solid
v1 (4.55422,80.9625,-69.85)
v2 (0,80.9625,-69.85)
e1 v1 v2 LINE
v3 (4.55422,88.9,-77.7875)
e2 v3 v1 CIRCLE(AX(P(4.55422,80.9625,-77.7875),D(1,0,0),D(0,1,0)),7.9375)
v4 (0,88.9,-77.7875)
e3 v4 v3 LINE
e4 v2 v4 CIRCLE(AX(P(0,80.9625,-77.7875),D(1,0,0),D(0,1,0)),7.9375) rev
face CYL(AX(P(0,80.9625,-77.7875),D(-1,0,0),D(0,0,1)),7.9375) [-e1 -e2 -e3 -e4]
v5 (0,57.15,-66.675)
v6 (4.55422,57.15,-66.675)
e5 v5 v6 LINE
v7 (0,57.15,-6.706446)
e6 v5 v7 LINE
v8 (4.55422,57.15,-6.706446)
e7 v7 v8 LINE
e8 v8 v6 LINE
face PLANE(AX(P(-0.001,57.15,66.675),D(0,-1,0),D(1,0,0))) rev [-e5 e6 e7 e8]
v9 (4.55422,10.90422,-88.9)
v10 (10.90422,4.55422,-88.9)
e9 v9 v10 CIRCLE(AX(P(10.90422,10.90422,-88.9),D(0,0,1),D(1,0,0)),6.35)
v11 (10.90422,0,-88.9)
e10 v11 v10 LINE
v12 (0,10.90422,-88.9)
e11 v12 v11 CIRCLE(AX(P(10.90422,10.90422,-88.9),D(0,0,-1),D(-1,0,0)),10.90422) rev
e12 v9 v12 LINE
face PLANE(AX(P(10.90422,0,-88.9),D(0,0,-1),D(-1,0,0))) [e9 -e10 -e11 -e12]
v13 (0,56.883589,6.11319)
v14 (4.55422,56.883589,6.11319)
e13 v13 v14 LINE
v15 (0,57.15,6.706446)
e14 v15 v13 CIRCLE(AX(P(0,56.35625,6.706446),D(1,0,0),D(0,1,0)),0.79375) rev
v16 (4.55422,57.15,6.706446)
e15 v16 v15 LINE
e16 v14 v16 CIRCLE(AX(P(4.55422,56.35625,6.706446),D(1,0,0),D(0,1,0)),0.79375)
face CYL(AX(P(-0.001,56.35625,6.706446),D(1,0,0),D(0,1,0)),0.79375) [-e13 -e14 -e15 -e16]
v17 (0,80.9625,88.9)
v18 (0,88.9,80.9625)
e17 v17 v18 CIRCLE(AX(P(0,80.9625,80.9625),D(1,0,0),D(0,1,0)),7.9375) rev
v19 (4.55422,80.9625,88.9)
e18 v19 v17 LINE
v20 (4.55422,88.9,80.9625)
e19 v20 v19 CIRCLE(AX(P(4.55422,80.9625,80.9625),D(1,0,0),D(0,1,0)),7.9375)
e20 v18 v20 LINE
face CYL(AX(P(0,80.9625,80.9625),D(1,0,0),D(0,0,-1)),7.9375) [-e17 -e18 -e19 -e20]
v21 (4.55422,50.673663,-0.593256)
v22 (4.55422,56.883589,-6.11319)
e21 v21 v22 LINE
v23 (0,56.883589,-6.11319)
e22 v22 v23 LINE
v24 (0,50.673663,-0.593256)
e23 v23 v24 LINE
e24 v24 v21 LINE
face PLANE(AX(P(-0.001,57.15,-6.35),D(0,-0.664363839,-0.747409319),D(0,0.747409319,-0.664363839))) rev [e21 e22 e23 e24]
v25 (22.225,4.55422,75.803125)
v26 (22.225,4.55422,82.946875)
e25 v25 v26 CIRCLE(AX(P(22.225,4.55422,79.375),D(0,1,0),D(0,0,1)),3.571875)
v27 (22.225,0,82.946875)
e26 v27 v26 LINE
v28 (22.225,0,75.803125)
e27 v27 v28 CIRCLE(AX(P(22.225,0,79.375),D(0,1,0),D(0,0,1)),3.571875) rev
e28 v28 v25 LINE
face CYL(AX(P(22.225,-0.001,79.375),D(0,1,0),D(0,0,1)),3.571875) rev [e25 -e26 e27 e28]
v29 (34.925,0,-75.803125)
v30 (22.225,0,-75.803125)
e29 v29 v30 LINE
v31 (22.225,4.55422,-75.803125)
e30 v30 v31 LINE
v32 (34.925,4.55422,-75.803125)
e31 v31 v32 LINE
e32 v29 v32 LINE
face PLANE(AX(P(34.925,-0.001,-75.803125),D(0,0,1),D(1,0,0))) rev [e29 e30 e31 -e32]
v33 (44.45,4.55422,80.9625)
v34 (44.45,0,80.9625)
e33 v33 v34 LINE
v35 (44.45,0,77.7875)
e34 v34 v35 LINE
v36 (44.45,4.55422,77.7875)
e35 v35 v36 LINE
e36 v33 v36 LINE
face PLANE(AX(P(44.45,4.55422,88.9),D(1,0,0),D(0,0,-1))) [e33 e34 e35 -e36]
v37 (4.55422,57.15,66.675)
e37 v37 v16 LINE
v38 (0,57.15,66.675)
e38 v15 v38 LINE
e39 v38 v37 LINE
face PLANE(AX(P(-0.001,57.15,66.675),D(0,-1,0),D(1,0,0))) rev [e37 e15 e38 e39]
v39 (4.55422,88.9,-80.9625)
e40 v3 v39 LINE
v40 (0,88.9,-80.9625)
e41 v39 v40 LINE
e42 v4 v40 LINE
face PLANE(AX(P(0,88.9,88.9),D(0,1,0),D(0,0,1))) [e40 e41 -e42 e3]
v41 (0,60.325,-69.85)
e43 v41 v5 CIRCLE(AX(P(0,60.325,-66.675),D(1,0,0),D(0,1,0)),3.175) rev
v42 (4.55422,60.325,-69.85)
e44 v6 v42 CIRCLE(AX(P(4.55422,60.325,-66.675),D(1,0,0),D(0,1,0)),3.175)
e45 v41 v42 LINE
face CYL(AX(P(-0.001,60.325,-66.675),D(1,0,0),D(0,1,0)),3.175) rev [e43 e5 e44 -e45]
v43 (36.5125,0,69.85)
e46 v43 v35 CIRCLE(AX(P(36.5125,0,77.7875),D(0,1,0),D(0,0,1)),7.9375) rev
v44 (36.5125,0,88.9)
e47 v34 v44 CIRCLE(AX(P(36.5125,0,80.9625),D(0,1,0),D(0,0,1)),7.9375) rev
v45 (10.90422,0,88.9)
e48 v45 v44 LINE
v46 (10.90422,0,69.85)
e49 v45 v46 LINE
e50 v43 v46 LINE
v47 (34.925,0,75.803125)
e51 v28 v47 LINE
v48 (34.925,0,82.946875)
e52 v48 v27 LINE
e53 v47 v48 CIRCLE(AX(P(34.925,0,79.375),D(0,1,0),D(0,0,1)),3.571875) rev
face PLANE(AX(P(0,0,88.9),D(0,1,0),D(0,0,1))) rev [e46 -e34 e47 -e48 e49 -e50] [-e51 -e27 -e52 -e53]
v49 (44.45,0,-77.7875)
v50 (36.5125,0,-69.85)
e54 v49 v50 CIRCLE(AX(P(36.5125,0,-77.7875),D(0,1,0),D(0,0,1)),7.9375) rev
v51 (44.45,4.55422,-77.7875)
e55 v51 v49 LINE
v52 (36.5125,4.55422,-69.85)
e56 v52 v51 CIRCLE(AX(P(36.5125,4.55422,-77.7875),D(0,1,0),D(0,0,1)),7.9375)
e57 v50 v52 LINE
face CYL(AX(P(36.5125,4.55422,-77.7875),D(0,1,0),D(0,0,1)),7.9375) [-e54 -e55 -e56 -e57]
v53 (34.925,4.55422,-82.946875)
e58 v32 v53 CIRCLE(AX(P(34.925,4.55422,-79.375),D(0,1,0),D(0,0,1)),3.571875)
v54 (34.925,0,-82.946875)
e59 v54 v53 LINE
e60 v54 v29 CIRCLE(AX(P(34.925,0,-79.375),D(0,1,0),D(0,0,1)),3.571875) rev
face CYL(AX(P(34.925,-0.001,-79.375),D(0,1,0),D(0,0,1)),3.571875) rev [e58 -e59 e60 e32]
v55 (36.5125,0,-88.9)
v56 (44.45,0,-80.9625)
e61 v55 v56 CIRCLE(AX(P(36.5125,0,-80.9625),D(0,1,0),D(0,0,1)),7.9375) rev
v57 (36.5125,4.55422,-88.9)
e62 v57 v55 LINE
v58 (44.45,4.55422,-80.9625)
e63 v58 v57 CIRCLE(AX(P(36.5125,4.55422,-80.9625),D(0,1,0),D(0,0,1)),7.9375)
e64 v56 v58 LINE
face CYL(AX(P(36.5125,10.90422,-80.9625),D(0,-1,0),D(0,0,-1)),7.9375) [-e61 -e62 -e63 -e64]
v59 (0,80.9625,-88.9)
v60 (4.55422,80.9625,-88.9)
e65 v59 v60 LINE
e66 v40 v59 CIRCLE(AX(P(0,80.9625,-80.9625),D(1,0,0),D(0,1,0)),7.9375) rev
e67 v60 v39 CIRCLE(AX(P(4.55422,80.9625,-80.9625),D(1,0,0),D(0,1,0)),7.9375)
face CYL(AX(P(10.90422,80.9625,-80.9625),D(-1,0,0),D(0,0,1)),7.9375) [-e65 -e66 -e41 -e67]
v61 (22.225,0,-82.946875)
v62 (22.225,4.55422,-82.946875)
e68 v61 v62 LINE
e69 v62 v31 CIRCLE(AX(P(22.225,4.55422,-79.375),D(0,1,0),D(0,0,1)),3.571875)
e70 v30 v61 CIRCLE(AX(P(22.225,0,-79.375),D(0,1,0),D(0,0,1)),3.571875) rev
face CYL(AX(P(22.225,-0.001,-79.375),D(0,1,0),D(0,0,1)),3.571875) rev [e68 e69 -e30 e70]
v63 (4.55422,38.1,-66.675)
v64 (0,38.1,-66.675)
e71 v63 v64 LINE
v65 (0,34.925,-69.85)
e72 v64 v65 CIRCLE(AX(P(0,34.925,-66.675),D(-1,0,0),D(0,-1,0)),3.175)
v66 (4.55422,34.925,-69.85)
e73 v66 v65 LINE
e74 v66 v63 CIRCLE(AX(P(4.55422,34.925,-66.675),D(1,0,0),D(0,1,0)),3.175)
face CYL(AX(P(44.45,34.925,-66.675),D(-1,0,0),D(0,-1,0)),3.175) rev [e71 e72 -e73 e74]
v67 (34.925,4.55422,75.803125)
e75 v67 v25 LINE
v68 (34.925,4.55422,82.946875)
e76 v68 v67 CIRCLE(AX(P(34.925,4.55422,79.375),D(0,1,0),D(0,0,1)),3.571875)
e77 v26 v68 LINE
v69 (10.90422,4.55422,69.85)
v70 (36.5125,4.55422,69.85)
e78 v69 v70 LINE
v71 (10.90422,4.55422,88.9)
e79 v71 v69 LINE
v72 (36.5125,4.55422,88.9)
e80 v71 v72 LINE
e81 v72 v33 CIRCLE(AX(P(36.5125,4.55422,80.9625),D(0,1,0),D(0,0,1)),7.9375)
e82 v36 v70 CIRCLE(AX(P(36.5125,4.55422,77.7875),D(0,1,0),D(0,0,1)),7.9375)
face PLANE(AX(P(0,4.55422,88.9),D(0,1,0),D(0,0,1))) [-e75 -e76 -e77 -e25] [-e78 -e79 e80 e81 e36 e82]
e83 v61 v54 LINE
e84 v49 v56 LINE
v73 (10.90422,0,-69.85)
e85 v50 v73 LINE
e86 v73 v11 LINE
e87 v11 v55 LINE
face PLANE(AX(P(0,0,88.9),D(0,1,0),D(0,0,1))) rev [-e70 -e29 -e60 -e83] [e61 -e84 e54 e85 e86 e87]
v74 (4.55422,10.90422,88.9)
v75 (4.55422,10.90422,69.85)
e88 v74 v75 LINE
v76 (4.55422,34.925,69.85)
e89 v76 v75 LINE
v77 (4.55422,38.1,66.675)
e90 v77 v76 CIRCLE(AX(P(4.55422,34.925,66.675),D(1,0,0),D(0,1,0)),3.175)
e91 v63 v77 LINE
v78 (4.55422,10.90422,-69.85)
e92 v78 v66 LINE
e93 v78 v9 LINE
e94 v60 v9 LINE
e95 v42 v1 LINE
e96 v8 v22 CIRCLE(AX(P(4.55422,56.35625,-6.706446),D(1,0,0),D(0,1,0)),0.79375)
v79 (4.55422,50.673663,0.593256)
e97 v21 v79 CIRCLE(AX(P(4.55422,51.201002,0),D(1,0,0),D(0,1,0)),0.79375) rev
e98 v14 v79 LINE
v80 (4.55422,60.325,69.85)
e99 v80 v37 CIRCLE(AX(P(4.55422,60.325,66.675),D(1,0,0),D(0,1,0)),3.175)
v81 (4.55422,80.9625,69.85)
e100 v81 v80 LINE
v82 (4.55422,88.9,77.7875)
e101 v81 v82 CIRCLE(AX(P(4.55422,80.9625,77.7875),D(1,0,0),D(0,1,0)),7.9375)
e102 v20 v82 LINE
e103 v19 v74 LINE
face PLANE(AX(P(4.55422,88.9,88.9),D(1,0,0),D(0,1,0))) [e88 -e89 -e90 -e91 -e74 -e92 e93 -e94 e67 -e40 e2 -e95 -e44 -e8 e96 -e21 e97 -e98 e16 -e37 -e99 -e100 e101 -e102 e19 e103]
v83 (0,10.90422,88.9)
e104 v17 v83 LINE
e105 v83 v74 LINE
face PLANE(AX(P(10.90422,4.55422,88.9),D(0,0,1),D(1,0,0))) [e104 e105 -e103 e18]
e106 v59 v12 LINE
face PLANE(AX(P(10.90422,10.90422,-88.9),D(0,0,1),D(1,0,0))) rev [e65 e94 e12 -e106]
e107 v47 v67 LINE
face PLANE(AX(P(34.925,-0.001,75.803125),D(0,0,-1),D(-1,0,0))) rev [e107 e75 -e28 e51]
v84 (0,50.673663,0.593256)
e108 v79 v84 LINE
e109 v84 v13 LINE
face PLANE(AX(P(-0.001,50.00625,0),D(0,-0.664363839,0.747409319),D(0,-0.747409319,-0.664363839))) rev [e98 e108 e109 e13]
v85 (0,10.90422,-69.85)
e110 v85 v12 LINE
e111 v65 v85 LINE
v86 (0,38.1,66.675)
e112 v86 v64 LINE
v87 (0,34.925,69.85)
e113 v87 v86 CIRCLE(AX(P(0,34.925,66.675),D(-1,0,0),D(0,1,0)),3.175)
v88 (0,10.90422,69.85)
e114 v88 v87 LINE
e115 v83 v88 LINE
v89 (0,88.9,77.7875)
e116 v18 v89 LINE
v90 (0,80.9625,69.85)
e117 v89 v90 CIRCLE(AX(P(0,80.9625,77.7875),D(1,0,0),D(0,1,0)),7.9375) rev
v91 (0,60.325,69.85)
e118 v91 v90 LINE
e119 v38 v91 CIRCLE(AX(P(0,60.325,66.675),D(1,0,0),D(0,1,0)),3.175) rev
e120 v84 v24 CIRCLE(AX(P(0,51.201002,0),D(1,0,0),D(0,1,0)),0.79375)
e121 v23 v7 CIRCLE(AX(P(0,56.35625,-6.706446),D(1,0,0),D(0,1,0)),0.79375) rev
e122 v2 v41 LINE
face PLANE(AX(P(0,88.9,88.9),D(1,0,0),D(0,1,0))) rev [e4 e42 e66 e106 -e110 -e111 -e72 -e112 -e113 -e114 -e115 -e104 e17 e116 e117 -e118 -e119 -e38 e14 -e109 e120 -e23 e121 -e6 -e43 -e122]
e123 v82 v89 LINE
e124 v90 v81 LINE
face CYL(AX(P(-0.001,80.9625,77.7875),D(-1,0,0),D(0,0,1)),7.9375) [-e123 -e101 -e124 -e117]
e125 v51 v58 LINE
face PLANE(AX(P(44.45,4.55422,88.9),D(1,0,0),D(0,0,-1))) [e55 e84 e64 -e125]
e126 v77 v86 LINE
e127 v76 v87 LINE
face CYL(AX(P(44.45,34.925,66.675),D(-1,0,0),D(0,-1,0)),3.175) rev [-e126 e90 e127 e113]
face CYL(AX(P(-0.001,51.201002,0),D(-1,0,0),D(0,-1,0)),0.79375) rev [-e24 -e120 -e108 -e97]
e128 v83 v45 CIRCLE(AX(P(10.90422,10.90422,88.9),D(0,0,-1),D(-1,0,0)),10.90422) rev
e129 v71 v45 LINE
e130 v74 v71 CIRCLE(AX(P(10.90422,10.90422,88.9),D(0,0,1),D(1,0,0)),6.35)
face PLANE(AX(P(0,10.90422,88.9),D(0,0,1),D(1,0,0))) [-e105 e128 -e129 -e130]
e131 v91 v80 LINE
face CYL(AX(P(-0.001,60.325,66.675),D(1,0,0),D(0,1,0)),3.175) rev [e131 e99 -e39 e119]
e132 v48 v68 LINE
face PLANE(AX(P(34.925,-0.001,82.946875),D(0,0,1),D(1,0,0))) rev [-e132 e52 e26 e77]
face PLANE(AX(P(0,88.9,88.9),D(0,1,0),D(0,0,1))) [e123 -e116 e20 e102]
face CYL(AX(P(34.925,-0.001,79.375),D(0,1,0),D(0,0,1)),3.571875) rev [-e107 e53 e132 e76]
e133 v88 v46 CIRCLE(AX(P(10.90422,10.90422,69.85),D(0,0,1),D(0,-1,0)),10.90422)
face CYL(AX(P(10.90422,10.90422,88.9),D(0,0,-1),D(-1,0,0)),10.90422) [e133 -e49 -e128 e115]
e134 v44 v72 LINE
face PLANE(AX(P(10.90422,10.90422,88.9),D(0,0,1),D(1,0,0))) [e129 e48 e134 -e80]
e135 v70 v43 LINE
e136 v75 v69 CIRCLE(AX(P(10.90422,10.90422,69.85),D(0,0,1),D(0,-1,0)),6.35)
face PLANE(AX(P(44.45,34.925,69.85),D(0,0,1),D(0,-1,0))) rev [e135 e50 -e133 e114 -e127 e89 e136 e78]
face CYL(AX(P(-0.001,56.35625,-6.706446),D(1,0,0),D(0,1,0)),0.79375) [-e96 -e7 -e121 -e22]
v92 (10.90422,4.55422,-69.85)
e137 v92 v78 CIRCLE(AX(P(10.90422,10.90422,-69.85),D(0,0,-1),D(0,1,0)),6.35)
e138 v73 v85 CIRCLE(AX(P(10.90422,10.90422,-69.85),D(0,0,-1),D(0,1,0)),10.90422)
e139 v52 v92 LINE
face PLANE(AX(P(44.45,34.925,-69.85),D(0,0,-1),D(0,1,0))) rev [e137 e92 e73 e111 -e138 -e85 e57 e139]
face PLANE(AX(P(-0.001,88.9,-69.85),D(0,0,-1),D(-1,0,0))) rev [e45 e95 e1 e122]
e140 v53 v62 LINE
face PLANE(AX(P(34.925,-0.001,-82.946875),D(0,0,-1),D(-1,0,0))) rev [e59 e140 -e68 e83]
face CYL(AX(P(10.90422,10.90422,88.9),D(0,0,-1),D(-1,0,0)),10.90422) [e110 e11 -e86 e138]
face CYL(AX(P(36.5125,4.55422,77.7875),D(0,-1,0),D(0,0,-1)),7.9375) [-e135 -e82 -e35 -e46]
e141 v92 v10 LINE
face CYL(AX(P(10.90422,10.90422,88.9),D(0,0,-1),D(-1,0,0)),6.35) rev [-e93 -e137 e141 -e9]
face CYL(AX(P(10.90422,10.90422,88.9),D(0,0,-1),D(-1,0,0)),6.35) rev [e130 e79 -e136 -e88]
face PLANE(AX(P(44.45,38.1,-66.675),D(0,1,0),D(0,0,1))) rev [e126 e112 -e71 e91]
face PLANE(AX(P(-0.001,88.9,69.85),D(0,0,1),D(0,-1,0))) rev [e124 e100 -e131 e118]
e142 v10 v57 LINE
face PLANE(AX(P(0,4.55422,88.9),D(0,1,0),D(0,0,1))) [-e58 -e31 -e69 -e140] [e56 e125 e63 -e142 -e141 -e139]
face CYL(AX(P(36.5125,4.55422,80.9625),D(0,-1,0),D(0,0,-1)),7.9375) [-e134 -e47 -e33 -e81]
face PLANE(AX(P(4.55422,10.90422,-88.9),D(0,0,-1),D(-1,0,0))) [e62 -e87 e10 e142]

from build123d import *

# Parameters (mm, degrees)
BASE_FLANGE1_DEPTH = 88.9
EXTRUDE2_REACH     = 132.358
EXTRUDE3_REACH     = 133.902
EXTRUDE4_DEPTH     = 134.35
FILLET1_R          = 7.9375
CUT_EXTRUDE1_REACH = 133.902
FILLET2_R          = 0.79375


# Sheet-metal steps are written as plain solids
with BuildPart() as part:
    # Sketch1 → Base-Flange1 (new, symmetric)
    with BuildSketch(Plane.XY):
        with BuildLine():
            Line((0, 88.9), (0, 10.90422))
            ThreePointArc((0, 10.90422), (3.193772094, 3.193772094), (10.90422, 0))
            Line((10.90422, 0), (44.45, 0))
            Line((44.45, 0), (44.45, 4.55422))
            Line((44.45, 4.55422), (10.90422, 4.55422))
            ThreePointArc((10.90422, 4.55422), (6.414091939, 6.414091939), (4.55422, 10.90422))
            Line((4.55422, 10.90422), (4.55422, 88.9))
            Line((4.55422, 88.9), (0, 88.9))
        make_face()
    extrude(amount=BASE_FLANGE1_DEPTH, both=True)

    # Sketch3 → Extrude2 (cut, up to next)
    with BuildSketch(Plane(origin=(0, 4.55422, 0), x_dir=(1, 0, 0), z_dir=(0, 1, 0)), mode=Mode.PRIVATE) as extrude2_sk1:
        with BuildLine():
            Line((34.925, -82.946875), (22.225, -82.946875))
            ThreePointArc((22.225, -82.946875), (18.653125, -79.375), (22.225, -75.803125))
            Line((22.225, -75.803125), (34.925, -75.803125))
            ThreePointArc((34.925, -75.803125), (38.496875, -79.375), (34.925, -82.946875))
        make_face()
    extrude2_tool1 = extrude(extrude2_sk1.sketch, amount=-EXTRUDE2_REACH, mode=Mode.PRIVATE) & part.part
    # Sketch3 → Extrude2 (cut, up to next)
    with BuildSketch(Plane(origin=(0, 4.55422, 0), x_dir=(1, 0, 0), z_dir=(0, 1, 0)), mode=Mode.PRIVATE) as extrude2_sk2:
        with BuildLine():
            Line((34.925, 75.803125), (22.225, 75.803125))
            ThreePointArc((22.225, 75.803125), (18.653125, 79.375), (22.225, 82.946875))
            Line((22.225, 82.946875), (34.925, 82.946875))
            ThreePointArc((34.925, 82.946875), (38.496875, 79.375), (34.925, 75.803125))
        make_face()
    extrude2_tool2 = extrude(extrude2_sk2.sketch, amount=-EXTRUDE2_REACH, mode=Mode.PRIVATE) & part.part
    add(extrude2_tool1.solids().sort_by_distance((28.575, 4.55422, 79.375))[0], mode=Mode.SUBTRACT)
    add(extrude2_tool2.solids().sort_by_distance((28.575, 4.55422, -79.375))[0], mode=Mode.SUBTRACT)

    # Sketch4 → Extrude3 (cut, up to next)
    with BuildSketch(Plane(origin=(4.55422, 0, 0), x_dir=(0, 0, -1), z_dir=(1, 0, 0)), mode=Mode.PRIVATE) as extrude3_sk1:
        with BuildLine():
            Line((-69.85, 88.9), (69.85, 88.9))
            Line((69.85, 88.9), (69.85, 60.325))
            ThreePointArc((69.85, 60.325), (68.92006403, 58.07993597), (66.675, 57.15))
            Line((66.675, 57.15), (-66.675, 57.15))
            ThreePointArc((-66.675, 57.15), (-68.92006403, 58.07993597), (-69.85, 60.325))
            Line((-69.85, 60.325), (-69.85, 88.9))
        make_face()
    extrude3_tool1 = extrude(extrude3_sk1.sketch, amount=-EXTRUDE3_REACH, mode=Mode.PRIVATE) & part.part
    add(extrude3_tool1.solids().sort_by_distance((4.55422, 73.039808, 0))[0], mode=Mode.SUBTRACT)

    # Sketch5 → Extrude4 (cut, through all)
    with BuildSketch(Plane.ZY):
        with BuildLine():
            Line((-66.675, 38.1), (66.675, 38.1))
            ThreePointArc((66.675, 38.1), (68.92006403, 37.17006403), (69.85, 34.925))
            Line((69.85, 34.925), (69.85, 0))
            Line((69.85, 0), (-69.85, 0))
            Line((-69.85, 0), (-69.85, 34.925))
            ThreePointArc((-69.85, 34.925), (-68.92006403, 37.17006403), (-66.675, 38.1))
        make_face()
    extrude(amount=-EXTRUDE4_DEPTH, mode=Mode.SUBTRACT)

    # Fillet1
    fillet1_edges = [part.edges().sort_by_distance(p)[0] for p in [
        (2.27711, 88.9, 88.9),
        (2.27711, 88.9, 69.85),
        (2.27711, 88.9, -69.85),
        (44.45, 2.27711, 88.9),
        (2.27711, 88.9, -88.9),
        (44.45, 2.27711, -88.9),
        (44.45, 2.27711, 69.85),
        (44.45, 2.27711, -69.85),
    ]]
    fillet(fillet1_edges, radius=FILLET1_R)

    # Sketch6 → Cut-Extrude1 (cut, up to next)
    with BuildSketch(Plane(origin=(4.55422, 0, 0), x_dir=(0, 0, -1), z_dir=(1, 0, 0)), mode=Mode.PRIVATE) as cut_extrude1_sk1:
        Polygon((-6.35, 57.15), (6.35, 57.15), (0, 50.00625), align=None)
    cut_extrude1_tool1 = extrude(cut_extrude1_sk1.sketch, amount=-CUT_EXTRUDE1_REACH, mode=Mode.PRIVATE) & part.part
    add(cut_extrude1_tool1.solids().sort_by_distance((4.55422, 54.76875, 0))[0], mode=Mode.SUBTRACT)

    # Fillet2
    fillet2_edges = [part.edges().sort_by_distance(p)[0] for p in [
        (2.27711, 50.00625, 0),
        (2.27711, 57.15, 6.35),
        (2.27711, 57.15, -6.35),
    ]]
    fillet(fillet2_edges, radius=FILLET2_R)


solid = part.part
